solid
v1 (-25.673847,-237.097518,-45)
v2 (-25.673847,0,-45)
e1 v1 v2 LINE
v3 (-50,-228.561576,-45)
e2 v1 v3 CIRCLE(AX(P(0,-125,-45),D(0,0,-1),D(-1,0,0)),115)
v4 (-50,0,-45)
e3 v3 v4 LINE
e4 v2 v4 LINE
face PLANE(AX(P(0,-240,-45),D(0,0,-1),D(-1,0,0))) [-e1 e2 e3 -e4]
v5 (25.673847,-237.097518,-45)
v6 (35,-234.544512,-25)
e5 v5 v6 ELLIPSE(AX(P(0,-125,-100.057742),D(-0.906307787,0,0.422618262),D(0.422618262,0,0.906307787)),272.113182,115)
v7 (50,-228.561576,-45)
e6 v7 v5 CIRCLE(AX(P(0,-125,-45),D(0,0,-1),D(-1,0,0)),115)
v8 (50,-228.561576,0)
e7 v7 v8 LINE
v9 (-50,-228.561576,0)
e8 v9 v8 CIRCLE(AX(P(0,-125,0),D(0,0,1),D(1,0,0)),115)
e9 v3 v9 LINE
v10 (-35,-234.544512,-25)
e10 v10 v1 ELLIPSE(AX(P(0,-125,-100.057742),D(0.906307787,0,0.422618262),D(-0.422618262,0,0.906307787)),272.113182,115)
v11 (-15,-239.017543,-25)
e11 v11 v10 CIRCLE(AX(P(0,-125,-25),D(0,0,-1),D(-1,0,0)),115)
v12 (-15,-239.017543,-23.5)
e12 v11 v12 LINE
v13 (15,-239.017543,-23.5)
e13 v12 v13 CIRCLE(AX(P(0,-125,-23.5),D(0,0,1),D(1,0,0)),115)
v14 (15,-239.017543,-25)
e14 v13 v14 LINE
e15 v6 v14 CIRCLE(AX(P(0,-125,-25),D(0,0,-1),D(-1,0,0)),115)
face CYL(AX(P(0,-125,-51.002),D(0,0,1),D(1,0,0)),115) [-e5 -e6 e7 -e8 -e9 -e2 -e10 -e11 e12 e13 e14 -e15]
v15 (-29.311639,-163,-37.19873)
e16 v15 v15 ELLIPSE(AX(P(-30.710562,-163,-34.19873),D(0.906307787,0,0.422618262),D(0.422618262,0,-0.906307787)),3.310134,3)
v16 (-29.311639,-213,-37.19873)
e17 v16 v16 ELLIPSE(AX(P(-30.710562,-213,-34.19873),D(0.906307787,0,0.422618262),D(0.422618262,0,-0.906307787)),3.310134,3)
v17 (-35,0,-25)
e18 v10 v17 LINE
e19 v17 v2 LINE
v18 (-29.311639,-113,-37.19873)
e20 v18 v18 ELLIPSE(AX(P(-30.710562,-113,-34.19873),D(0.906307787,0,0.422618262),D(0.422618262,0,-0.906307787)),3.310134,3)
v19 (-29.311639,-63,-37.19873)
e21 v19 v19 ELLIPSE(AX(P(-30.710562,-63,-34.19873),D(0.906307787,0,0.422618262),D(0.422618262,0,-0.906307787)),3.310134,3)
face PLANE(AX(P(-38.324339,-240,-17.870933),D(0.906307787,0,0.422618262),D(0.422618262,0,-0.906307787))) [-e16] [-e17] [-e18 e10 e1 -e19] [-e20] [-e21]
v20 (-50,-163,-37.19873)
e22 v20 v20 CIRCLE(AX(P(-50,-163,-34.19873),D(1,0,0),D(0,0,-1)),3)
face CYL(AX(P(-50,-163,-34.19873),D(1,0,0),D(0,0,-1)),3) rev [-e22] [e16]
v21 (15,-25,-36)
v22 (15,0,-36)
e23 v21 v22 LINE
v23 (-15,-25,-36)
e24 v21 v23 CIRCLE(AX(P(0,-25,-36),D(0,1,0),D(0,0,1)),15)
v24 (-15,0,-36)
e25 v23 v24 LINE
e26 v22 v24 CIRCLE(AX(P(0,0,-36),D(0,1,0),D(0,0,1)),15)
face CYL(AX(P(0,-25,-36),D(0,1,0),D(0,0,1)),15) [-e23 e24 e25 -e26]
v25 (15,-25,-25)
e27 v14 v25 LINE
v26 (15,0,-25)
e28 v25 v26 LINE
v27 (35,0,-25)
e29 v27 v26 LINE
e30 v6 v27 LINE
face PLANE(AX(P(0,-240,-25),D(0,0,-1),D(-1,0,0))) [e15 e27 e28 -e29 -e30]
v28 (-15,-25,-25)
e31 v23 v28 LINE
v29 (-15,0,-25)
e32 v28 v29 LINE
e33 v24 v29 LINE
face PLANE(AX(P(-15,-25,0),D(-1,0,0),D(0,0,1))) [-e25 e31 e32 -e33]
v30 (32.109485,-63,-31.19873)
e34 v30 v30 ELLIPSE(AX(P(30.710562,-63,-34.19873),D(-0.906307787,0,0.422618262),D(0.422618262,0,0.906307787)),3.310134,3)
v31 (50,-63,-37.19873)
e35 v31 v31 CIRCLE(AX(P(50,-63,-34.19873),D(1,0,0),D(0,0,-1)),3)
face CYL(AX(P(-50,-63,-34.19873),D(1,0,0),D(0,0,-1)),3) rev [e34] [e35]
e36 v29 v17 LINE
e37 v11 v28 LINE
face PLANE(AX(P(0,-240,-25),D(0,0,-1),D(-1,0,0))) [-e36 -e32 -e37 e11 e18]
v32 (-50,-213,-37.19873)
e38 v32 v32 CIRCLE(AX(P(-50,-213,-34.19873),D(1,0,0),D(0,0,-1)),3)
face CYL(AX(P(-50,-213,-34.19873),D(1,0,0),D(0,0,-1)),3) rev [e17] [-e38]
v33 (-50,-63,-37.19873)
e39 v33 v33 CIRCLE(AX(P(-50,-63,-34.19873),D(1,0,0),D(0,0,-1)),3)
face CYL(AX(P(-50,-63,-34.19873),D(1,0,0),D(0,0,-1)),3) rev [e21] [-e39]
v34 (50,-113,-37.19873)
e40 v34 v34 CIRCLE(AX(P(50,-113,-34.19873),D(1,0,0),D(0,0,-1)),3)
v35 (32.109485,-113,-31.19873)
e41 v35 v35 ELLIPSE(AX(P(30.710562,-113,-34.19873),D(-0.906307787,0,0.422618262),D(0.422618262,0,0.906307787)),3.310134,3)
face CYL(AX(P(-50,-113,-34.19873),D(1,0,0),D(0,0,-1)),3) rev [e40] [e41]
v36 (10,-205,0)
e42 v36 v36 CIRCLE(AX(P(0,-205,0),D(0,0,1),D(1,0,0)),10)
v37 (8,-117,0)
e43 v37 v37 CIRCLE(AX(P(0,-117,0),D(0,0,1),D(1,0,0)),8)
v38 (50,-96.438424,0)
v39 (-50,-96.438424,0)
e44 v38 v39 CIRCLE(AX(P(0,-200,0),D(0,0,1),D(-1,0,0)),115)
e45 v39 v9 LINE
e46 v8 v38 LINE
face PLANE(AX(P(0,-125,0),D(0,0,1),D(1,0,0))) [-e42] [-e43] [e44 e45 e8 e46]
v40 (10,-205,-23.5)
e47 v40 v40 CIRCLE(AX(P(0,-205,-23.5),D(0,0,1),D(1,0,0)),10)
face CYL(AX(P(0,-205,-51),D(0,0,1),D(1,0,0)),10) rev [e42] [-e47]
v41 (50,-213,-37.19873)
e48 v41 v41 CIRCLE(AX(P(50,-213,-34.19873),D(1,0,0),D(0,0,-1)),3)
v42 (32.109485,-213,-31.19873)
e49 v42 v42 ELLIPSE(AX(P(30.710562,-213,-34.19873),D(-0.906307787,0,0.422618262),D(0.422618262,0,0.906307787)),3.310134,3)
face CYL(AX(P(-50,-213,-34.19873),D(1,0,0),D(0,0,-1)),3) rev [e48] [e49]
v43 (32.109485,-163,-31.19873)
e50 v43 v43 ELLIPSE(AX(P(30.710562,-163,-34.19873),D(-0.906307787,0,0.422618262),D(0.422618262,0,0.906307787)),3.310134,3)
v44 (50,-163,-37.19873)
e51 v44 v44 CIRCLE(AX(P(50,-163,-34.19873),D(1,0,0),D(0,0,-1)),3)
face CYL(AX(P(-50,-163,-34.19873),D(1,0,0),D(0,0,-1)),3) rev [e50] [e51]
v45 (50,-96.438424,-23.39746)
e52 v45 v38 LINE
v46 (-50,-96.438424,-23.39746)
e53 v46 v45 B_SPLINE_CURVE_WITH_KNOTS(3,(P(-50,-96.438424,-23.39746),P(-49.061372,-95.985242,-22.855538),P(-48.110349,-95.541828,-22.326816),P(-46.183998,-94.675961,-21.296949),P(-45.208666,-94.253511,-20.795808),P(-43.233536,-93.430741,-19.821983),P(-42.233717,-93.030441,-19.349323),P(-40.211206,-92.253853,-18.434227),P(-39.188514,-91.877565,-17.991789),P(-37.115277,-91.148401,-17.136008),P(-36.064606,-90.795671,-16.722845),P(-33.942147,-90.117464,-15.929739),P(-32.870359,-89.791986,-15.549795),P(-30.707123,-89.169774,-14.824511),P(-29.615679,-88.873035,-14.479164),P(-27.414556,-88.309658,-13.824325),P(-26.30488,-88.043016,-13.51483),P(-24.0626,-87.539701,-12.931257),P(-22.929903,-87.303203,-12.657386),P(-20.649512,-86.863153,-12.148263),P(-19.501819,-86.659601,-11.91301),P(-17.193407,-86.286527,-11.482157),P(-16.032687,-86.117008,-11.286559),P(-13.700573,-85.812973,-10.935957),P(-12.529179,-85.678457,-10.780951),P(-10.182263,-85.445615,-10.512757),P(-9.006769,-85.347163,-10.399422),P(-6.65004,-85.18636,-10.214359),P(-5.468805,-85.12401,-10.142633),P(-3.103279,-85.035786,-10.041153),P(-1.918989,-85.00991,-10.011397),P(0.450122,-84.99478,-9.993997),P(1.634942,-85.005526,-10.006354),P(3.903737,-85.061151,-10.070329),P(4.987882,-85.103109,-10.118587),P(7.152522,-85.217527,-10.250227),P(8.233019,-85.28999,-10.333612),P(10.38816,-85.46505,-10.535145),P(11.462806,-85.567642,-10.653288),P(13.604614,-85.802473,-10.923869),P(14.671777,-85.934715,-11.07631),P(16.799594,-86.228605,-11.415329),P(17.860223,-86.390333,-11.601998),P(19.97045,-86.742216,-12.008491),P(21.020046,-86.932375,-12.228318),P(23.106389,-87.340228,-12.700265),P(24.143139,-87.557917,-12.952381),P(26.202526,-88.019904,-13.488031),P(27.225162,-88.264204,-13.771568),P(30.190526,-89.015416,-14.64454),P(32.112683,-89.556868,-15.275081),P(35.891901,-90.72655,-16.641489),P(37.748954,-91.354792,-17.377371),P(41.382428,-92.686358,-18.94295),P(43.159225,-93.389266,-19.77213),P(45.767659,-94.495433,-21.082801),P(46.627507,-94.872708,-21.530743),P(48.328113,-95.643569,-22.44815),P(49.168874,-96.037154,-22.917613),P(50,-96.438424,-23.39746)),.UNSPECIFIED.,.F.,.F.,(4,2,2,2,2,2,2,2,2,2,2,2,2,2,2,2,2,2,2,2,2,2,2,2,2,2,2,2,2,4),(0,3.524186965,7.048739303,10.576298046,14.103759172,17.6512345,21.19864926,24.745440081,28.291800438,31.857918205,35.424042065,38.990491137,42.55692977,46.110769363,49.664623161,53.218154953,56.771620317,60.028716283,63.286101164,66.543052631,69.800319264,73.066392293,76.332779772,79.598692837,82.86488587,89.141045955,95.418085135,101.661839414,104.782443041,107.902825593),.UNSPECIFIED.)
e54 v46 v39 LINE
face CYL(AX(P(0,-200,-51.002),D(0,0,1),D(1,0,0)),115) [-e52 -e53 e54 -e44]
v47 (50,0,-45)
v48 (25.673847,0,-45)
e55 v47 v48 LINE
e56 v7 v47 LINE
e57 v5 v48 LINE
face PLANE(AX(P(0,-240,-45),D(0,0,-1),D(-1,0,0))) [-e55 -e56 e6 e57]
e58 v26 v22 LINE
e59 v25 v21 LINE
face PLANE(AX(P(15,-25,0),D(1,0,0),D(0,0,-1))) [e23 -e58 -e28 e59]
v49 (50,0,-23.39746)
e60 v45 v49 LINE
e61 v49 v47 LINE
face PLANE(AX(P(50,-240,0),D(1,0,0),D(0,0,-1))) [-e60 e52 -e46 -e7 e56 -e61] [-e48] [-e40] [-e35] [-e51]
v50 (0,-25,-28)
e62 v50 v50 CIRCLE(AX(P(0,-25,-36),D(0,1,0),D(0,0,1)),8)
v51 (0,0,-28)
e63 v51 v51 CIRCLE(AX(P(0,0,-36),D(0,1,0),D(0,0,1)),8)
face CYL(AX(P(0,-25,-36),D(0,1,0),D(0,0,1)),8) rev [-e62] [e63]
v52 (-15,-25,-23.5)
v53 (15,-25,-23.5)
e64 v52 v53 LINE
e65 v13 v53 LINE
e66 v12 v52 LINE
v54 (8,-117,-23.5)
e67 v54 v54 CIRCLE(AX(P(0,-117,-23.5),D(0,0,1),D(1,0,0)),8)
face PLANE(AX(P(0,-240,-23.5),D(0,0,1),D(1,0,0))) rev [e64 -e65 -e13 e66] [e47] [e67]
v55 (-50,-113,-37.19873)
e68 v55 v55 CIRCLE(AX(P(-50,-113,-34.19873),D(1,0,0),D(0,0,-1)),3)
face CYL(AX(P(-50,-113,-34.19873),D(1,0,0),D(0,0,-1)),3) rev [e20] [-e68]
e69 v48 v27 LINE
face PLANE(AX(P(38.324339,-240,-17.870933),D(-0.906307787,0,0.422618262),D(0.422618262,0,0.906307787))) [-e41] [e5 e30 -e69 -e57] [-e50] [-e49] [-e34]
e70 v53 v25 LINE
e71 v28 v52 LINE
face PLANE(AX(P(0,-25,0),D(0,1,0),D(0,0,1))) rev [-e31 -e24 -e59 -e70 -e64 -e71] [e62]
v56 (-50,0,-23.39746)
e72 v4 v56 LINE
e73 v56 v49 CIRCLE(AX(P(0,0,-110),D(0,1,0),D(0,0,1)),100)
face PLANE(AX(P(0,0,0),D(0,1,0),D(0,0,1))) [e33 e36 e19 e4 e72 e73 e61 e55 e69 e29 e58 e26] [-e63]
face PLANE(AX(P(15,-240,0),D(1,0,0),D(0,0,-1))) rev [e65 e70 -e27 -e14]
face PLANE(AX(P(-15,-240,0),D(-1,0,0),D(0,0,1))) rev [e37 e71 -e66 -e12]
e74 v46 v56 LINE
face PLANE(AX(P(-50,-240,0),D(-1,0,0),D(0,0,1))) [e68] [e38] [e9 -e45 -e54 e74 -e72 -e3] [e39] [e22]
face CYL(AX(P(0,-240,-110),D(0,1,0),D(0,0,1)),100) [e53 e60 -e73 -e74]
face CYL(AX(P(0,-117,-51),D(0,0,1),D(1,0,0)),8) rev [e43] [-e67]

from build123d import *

# Parameters (mm, degrees)
SKETCH1_R           = 8
BOSS_EXTRUDE1_DEPTH = 25
BOSS_EXTRUDE2_DEPTH = 240
BOSS_EXTRUDE3_REACH = 252.402
SKETCH3_R           = 8
SKETCH3_R_2         = 10
CUT_EXTRUDE1_DEPTH  = 251.401677426
SKETCH4_R           = 3
CUT_EXTRUDE2_DEPTH  = 265.954713149


with BuildPart() as part:
    # Sketch1 → Boss-Extrude1 (new body)
    with BuildSketch(Plane(origin=(0, 0, 0), x_dir=(1, 0, 0), z_dir=(0, 1, 0))):
        with BuildLine():
            Line((-15, 36), (-15, 25))
            Line((-15, 25), (-15, 23.5))
            Line((-15, 23.5), (15, 23.5))
            Line((15, 23.5), (15, 25))
            Line((15, 25), (15, 36))
            ThreePointArc((15, 36), (0, 51), (-15, 36))
        make_face()
        with Locations((0, 36)):
            Circle(SKETCH1_R, mode=Mode.SUBTRACT)
    extrude(amount=-BOSS_EXTRUDE1_DEPTH)

    # Sketch1<3> → Boss-Extrude2 (add)
    with BuildSketch(Plane(origin=(0, 0, 0), x_dir=(1, 0, 0), z_dir=(0, 1, 0))):
        with BuildLine():
            Line((-50, 45), (-50, 23.397459622))
            ThreePointArc((-50, 23.397459622), (0, 10), (50, 23.397459622))
            Line((50, 23.397459622), (50, 45))
            Line((50, 45), (25.673846837, 45))
            Line((25.673846837, 45), (35, 25))
            Line((35, 25), (15, 25))
            Line((15, 25), (15, 23.5))
            Line((15, 23.5), (-15, 23.5))
            Line((-15, 23.5), (-15, 25))
            Line((-15, 25), (-35, 25))
            Line((-35, 25), (-25.673846837, 45))
            Line((-25.673846837, 45), (-50, 45))
        make_face()
    extrude(amount=-BOSS_EXTRUDE2_DEPTH)

    # Sketch2 → Boss-Extrude3 (add, up to next)
    with BuildSketch(Plane.XY, mode=Mode.PRIVATE) as boss_extrude3_sk1:
        with BuildLine():
            Line((50, -96.438424114), (50, -228.561575886))
            ThreePointArc((50, -228.561575886), (0, -240), (-50, -228.561575886))
            Line((-50, -228.561575886), (-50, -96.438424114))
            ThreePointArc((-50, -96.438424114), (0, -85), (50, -96.438424114))
        make_face()
    boss_extrude3_tool1 = extrude(boss_extrude3_sk1.sketch, amount=-BOSS_EXTRUDE3_REACH, mode=Mode.PRIVATE) - part.part
    add(boss_extrude3_tool1.solids().sort_by_distance((0, -162.5, 0))[0])

    # Sketch3 → Cut-Extrude1 (cut, through all)
    with BuildSketch(Plane.XY):
        with BuildLine():
            ThreePointArc((0, -240), (-25.645845405, -237.103927734), (-50, -228.561575886))
            Line((-50, -228.561575886), (-50, -240))
            Line((-50, -240), (0, -240))
        make_face()
        with BuildLine():
            ThreePointArc((50, -228.561575886), (25.645845405, -237.103927734), (0, -240))
            Line((0, -240), (50, -240))
            Line((50, -240), (50, -228.561575886))
        make_face()
        with Locations((0, -117)):
            Circle(SKETCH3_R)
        with Locations((0, -205)):
            Circle(SKETCH3_R_2)
    extrude(amount=-CUT_EXTRUDE1_DEPTH, mode=Mode.SUBTRACT)

    # Sketch4 → Cut-Extrude2 (cut, through all)
    with BuildSketch(Plane(origin=(50, 0, 0), x_dir=(0, 0, -1), z_dir=(1, 0, 0))):
        with Locations((34.198729811, -63)):
            Circle(SKETCH4_R)
        with Locations((34.198729811, -113)):
            Circle(SKETCH4_R)
        with Locations((34.198729811, -163)):
            Circle(SKETCH4_R)
        with Locations((34.198729811, -213)):
            Circle(SKETCH4_R)
    extrude(amount=-CUT_EXTRUDE2_DEPTH, mode=Mode.SUBTRACT)


solid = part.part
